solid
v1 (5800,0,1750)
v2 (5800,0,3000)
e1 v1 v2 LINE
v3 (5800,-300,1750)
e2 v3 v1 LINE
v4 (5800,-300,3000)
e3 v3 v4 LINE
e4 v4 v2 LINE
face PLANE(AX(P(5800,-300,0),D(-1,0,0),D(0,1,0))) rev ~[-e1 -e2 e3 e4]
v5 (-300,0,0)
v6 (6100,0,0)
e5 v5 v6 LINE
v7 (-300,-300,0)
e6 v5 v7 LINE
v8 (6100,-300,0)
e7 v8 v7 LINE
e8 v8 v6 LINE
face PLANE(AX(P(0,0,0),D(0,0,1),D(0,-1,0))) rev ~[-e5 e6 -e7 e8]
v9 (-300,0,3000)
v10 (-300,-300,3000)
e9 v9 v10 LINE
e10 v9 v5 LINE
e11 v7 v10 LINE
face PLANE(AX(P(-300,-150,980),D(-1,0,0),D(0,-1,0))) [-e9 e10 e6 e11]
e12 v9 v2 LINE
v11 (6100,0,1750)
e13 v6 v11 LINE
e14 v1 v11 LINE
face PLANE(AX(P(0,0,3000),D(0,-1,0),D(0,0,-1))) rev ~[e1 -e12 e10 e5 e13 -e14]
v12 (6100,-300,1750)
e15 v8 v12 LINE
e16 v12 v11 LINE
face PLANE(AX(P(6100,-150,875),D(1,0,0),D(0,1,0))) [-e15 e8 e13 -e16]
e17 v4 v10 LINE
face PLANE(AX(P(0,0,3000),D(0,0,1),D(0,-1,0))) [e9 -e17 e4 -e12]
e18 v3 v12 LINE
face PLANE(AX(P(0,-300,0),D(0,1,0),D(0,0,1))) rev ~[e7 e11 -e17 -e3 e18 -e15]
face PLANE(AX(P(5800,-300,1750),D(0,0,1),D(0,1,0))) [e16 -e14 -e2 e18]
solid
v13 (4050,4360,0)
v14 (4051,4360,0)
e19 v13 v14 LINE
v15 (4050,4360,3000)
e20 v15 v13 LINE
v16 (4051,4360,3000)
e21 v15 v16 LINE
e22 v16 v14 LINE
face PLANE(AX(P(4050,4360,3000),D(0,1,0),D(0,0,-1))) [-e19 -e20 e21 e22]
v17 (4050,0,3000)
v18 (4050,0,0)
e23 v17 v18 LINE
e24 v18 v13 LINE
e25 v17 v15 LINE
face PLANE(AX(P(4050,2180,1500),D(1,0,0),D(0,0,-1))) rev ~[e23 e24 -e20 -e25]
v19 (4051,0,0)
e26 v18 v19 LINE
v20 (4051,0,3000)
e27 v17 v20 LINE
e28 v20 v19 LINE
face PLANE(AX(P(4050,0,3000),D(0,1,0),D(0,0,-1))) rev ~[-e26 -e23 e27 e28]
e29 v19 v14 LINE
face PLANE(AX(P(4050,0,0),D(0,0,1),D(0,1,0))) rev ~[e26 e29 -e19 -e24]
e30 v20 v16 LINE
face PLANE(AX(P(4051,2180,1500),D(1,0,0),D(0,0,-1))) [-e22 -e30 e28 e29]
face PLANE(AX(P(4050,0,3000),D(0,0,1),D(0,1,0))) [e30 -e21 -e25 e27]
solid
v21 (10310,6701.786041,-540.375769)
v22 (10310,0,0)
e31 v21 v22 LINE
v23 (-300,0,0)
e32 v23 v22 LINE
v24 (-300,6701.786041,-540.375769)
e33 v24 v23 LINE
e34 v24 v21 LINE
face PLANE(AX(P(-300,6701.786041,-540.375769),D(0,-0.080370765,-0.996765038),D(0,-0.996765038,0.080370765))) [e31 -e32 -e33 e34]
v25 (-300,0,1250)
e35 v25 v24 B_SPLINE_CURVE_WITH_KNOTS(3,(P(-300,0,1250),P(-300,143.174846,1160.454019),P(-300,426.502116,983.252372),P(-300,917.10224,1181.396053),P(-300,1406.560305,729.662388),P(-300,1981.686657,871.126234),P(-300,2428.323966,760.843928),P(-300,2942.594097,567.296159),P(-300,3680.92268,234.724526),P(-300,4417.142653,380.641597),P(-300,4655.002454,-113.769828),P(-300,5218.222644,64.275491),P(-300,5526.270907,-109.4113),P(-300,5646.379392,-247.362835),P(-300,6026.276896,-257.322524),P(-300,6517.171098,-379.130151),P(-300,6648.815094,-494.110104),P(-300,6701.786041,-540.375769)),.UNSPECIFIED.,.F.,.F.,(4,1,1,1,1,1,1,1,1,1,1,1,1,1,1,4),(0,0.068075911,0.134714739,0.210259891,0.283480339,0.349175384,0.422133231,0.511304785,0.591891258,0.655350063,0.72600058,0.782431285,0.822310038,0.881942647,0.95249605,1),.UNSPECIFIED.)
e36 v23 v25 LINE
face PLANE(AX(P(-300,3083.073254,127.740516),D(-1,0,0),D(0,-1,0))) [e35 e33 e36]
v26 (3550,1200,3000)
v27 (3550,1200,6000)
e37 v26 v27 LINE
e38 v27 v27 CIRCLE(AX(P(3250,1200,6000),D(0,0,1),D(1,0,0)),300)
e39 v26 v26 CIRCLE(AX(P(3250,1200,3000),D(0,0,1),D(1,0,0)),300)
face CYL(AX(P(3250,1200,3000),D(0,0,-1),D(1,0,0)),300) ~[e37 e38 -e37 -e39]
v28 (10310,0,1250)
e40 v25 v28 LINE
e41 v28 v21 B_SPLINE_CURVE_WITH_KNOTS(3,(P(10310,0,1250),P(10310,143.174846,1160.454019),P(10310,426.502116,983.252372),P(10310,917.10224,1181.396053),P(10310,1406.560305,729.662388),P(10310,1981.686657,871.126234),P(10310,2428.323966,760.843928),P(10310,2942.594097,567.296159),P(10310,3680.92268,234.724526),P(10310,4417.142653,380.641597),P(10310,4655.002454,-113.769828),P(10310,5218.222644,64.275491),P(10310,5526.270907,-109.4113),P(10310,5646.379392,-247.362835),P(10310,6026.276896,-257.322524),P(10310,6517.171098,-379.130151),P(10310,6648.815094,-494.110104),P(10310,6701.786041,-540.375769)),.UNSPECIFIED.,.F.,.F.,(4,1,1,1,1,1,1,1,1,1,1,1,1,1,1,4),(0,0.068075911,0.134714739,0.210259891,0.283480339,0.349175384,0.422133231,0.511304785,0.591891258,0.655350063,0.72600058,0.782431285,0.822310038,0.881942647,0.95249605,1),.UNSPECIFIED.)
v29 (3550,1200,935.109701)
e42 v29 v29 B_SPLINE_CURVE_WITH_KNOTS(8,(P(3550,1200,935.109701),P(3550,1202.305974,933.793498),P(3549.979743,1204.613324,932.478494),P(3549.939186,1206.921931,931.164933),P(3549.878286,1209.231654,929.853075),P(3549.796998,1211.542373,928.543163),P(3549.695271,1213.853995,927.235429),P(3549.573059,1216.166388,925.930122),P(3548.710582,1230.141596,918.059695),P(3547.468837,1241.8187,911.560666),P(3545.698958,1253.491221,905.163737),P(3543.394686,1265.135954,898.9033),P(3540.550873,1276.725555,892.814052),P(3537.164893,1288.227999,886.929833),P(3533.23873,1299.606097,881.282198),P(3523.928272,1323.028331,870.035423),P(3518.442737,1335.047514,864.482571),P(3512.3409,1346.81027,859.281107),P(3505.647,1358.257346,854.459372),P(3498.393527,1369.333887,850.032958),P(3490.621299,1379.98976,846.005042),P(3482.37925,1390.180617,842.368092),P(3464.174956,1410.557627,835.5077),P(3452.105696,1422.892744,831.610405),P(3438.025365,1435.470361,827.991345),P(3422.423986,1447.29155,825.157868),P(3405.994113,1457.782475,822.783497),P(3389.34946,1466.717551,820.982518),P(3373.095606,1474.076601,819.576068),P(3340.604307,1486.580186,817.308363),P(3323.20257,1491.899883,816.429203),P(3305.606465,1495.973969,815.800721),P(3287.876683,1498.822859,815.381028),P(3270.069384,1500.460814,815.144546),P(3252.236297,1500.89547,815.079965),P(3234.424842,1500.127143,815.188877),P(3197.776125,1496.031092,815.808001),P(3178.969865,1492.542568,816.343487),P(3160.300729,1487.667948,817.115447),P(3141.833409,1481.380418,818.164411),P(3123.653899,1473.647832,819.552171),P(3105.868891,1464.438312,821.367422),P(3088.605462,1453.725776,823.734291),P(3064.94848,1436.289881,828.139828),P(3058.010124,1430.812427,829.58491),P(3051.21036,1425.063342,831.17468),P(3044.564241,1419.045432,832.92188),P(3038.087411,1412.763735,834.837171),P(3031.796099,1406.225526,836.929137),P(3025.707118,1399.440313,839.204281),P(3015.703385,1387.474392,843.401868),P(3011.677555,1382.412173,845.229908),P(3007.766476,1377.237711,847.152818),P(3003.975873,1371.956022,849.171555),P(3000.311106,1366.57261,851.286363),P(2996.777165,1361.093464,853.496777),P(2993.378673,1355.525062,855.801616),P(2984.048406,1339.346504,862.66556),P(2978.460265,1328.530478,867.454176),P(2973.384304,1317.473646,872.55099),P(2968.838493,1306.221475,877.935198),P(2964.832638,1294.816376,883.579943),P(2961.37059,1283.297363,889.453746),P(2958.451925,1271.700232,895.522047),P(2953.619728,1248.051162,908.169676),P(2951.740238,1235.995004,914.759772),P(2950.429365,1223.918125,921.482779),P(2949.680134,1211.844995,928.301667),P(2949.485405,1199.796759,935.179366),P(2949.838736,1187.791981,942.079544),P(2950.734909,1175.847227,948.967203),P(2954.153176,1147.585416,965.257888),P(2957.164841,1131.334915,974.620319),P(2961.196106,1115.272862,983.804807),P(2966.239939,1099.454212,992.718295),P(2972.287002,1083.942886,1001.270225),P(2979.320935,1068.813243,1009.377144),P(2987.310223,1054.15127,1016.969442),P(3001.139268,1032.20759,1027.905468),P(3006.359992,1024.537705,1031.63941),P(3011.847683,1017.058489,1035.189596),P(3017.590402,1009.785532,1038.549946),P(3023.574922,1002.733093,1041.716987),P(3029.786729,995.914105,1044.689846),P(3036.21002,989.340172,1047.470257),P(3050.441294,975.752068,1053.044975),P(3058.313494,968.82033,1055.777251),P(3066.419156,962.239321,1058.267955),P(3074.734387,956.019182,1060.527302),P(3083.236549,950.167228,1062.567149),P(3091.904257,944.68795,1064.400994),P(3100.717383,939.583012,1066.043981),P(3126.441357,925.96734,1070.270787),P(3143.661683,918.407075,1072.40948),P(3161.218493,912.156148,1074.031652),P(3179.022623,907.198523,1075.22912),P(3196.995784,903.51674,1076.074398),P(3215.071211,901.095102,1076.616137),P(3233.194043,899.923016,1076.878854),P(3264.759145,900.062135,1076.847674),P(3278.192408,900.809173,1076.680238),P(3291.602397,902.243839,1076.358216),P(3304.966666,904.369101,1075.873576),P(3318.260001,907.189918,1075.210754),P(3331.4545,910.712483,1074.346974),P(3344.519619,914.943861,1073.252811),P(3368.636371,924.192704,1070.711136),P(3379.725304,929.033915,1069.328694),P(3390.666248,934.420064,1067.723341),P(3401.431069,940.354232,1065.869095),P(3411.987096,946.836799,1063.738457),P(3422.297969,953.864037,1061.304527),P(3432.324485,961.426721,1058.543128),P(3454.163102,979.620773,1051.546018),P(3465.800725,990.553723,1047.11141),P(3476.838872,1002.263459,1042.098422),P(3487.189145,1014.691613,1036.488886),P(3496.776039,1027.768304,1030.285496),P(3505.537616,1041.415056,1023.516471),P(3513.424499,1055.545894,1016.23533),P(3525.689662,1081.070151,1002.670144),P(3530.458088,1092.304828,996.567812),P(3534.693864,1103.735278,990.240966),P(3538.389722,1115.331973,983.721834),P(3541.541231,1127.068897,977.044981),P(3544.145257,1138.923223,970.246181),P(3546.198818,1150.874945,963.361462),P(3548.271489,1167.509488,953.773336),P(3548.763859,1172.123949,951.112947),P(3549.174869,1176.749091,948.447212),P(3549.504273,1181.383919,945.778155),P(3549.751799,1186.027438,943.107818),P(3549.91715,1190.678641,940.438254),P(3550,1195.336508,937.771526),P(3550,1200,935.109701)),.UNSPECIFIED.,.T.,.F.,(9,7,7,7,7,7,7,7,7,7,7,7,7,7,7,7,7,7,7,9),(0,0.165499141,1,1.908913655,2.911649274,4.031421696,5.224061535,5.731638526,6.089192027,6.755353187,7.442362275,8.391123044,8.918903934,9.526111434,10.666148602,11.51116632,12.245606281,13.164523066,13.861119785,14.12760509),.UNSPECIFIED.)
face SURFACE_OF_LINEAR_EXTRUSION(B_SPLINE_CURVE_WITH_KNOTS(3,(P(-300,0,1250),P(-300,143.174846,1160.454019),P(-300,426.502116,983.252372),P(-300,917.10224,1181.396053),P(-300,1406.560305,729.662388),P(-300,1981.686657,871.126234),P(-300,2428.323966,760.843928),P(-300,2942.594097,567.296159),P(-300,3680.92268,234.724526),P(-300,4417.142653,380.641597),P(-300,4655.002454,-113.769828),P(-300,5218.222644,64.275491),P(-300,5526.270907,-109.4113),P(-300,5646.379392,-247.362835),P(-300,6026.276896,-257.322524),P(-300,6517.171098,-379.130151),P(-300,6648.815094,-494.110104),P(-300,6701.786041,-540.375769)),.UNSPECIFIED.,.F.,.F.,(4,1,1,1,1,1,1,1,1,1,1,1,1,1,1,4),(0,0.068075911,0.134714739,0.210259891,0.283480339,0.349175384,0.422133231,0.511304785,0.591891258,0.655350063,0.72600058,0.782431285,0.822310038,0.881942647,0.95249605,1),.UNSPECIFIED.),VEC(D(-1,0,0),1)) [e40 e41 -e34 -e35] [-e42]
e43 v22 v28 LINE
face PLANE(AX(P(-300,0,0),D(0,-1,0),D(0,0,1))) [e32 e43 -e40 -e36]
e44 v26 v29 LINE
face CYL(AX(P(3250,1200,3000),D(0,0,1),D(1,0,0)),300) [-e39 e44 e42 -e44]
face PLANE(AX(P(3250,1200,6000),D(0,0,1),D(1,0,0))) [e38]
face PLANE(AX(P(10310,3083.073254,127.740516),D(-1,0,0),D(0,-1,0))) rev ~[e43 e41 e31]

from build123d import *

# Parameters (mm, degrees)
F0_W      = 5800
F0_H      = 300
F1_DEPTH  = 3000
F2_W      = 300
F2_H      = 1750
F3_DEPTH  = 300
F4_W      = 300
F4_H      = 1960
F4_H_2    = 1040
F5_DEPTH  = 300
F12_DEPTH = 10610
F11_R     = 300
F14_DEPTH = 3000
F10_E8_W  = 3000
F10_E8_H  = 4360
F15_DEPTH = 1


# Not quite as in the source:
# - a feature of the source that left no trace in its solid (it failed there, or was rolled back) is left out


with BuildPart() as f1:
    # F0 (on Top) → F1 (new body)
    with BuildSketch(Plane.XY):
        with Locations((2900, -150)):
            Rectangle(F0_W, F0_H)
    extrude(amount=F1_DEPTH)

    # F2 (on face) → F3 (join)
    with BuildSketch(Plane.YZ.offset(5800)):
        with Locations((-150, 875)):
            Rectangle(F2_W, F2_H)
    extrude(amount=F3_DEPTH)

    # F4 (on face) → F5 (join)
    with BuildSketch(Plane(origin=(0, 0, 0), x_dir=(0, -1, 0), z_dir=(-1, 0, 0))):
        with Locations((150, 980)):
            Rectangle(F4_W, F4_H)
        with Locations((150, 2480)):
            Rectangle(F4_W, F4_H_2)
    extrude(amount=F5_DEPTH)


with BuildPart() as f12:
    # F8 (on face) → F12 (new body)
    with BuildSketch(Plane(origin=(-300, 0, 0), x_dir=(0, -1, 0), z_dir=(-1, 0, 0))):
        with BuildLine():
            Line((0, 0), (0, 1250))
            add(Edge.make_bspline(
                [(0, 1250), (-143.1748461176, 1160.4540186162), (-426.5021162652, 983.2523721949), (-917.1022397172, 1181.3960526208), (-1406.5603052218, 729.6623883693), (-1981.6866568889, 871.1262336875), (-2428.3239658637, 760.8439284346), (-2942.5940967446, 567.2961590142), (-3680.9226802544, 234.724526235), (-4417.1426534692, 380.6415969382), (-4655.0024542936, -113.7698280504), (-5218.2226437508, 64.2754910253), (-5526.2709066711, -109.4112998292), (-5646.3793917658, -247.3628347645), (-6026.2768963987, -257.3225241521), (-6517.1710983426, -379.1301511217), (-6648.8150937925, -494.1101038226), (-6701.7860412598, -540.3757691383)],
                knots=[0, 0, 0, 0, 0.068075911, 0.1347147389, 0.2102598907, 0.2834803393, 0.3491753838, 0.422133231, 0.511304785, 0.5918912576, 0.6553500627, 0.7260005804, 0.7824312848, 0.8223100383, 0.8819426474, 0.9524960497, 1, 1, 1, 1], degree=3))
            Line((-6701.7860412598, -540.3757691383), (0, 0))
        make_face()
    extrude(amount=-F12_DEPTH)

    # F11 (on face) → F13 (join, up to the next surface of F12)
    with BuildSketch(Plane.XY.offset(3000)):
        with Locations((3250, 1200)):
            Circle(F11_R)
    extrude(until=Until.NEXT, dir=(0, 0, -1))

    # F14 (add): a face of the model
    f14_faces = [f12.faces().sort_by_distance(p)[0] for p in [
        (3250, 1200, 3000),
    ]]
    extrude(f14_faces, amount=F14_DEPTH)


with BuildPart() as f15:
    # F10_E8 (on explicit) → F15 (new body)
    with BuildSketch(Plane(origin=(4050, 0, 3000), x_dir=(0, 0, -1), z_dir=(1, 0, 0))):
        with Locations((1500, 2180)):
            Rectangle(F10_E8_W, F10_E8_H)
    extrude(amount=F15_DEPTH)


solid = Compound([f1.part, f12.part, f15.part])
